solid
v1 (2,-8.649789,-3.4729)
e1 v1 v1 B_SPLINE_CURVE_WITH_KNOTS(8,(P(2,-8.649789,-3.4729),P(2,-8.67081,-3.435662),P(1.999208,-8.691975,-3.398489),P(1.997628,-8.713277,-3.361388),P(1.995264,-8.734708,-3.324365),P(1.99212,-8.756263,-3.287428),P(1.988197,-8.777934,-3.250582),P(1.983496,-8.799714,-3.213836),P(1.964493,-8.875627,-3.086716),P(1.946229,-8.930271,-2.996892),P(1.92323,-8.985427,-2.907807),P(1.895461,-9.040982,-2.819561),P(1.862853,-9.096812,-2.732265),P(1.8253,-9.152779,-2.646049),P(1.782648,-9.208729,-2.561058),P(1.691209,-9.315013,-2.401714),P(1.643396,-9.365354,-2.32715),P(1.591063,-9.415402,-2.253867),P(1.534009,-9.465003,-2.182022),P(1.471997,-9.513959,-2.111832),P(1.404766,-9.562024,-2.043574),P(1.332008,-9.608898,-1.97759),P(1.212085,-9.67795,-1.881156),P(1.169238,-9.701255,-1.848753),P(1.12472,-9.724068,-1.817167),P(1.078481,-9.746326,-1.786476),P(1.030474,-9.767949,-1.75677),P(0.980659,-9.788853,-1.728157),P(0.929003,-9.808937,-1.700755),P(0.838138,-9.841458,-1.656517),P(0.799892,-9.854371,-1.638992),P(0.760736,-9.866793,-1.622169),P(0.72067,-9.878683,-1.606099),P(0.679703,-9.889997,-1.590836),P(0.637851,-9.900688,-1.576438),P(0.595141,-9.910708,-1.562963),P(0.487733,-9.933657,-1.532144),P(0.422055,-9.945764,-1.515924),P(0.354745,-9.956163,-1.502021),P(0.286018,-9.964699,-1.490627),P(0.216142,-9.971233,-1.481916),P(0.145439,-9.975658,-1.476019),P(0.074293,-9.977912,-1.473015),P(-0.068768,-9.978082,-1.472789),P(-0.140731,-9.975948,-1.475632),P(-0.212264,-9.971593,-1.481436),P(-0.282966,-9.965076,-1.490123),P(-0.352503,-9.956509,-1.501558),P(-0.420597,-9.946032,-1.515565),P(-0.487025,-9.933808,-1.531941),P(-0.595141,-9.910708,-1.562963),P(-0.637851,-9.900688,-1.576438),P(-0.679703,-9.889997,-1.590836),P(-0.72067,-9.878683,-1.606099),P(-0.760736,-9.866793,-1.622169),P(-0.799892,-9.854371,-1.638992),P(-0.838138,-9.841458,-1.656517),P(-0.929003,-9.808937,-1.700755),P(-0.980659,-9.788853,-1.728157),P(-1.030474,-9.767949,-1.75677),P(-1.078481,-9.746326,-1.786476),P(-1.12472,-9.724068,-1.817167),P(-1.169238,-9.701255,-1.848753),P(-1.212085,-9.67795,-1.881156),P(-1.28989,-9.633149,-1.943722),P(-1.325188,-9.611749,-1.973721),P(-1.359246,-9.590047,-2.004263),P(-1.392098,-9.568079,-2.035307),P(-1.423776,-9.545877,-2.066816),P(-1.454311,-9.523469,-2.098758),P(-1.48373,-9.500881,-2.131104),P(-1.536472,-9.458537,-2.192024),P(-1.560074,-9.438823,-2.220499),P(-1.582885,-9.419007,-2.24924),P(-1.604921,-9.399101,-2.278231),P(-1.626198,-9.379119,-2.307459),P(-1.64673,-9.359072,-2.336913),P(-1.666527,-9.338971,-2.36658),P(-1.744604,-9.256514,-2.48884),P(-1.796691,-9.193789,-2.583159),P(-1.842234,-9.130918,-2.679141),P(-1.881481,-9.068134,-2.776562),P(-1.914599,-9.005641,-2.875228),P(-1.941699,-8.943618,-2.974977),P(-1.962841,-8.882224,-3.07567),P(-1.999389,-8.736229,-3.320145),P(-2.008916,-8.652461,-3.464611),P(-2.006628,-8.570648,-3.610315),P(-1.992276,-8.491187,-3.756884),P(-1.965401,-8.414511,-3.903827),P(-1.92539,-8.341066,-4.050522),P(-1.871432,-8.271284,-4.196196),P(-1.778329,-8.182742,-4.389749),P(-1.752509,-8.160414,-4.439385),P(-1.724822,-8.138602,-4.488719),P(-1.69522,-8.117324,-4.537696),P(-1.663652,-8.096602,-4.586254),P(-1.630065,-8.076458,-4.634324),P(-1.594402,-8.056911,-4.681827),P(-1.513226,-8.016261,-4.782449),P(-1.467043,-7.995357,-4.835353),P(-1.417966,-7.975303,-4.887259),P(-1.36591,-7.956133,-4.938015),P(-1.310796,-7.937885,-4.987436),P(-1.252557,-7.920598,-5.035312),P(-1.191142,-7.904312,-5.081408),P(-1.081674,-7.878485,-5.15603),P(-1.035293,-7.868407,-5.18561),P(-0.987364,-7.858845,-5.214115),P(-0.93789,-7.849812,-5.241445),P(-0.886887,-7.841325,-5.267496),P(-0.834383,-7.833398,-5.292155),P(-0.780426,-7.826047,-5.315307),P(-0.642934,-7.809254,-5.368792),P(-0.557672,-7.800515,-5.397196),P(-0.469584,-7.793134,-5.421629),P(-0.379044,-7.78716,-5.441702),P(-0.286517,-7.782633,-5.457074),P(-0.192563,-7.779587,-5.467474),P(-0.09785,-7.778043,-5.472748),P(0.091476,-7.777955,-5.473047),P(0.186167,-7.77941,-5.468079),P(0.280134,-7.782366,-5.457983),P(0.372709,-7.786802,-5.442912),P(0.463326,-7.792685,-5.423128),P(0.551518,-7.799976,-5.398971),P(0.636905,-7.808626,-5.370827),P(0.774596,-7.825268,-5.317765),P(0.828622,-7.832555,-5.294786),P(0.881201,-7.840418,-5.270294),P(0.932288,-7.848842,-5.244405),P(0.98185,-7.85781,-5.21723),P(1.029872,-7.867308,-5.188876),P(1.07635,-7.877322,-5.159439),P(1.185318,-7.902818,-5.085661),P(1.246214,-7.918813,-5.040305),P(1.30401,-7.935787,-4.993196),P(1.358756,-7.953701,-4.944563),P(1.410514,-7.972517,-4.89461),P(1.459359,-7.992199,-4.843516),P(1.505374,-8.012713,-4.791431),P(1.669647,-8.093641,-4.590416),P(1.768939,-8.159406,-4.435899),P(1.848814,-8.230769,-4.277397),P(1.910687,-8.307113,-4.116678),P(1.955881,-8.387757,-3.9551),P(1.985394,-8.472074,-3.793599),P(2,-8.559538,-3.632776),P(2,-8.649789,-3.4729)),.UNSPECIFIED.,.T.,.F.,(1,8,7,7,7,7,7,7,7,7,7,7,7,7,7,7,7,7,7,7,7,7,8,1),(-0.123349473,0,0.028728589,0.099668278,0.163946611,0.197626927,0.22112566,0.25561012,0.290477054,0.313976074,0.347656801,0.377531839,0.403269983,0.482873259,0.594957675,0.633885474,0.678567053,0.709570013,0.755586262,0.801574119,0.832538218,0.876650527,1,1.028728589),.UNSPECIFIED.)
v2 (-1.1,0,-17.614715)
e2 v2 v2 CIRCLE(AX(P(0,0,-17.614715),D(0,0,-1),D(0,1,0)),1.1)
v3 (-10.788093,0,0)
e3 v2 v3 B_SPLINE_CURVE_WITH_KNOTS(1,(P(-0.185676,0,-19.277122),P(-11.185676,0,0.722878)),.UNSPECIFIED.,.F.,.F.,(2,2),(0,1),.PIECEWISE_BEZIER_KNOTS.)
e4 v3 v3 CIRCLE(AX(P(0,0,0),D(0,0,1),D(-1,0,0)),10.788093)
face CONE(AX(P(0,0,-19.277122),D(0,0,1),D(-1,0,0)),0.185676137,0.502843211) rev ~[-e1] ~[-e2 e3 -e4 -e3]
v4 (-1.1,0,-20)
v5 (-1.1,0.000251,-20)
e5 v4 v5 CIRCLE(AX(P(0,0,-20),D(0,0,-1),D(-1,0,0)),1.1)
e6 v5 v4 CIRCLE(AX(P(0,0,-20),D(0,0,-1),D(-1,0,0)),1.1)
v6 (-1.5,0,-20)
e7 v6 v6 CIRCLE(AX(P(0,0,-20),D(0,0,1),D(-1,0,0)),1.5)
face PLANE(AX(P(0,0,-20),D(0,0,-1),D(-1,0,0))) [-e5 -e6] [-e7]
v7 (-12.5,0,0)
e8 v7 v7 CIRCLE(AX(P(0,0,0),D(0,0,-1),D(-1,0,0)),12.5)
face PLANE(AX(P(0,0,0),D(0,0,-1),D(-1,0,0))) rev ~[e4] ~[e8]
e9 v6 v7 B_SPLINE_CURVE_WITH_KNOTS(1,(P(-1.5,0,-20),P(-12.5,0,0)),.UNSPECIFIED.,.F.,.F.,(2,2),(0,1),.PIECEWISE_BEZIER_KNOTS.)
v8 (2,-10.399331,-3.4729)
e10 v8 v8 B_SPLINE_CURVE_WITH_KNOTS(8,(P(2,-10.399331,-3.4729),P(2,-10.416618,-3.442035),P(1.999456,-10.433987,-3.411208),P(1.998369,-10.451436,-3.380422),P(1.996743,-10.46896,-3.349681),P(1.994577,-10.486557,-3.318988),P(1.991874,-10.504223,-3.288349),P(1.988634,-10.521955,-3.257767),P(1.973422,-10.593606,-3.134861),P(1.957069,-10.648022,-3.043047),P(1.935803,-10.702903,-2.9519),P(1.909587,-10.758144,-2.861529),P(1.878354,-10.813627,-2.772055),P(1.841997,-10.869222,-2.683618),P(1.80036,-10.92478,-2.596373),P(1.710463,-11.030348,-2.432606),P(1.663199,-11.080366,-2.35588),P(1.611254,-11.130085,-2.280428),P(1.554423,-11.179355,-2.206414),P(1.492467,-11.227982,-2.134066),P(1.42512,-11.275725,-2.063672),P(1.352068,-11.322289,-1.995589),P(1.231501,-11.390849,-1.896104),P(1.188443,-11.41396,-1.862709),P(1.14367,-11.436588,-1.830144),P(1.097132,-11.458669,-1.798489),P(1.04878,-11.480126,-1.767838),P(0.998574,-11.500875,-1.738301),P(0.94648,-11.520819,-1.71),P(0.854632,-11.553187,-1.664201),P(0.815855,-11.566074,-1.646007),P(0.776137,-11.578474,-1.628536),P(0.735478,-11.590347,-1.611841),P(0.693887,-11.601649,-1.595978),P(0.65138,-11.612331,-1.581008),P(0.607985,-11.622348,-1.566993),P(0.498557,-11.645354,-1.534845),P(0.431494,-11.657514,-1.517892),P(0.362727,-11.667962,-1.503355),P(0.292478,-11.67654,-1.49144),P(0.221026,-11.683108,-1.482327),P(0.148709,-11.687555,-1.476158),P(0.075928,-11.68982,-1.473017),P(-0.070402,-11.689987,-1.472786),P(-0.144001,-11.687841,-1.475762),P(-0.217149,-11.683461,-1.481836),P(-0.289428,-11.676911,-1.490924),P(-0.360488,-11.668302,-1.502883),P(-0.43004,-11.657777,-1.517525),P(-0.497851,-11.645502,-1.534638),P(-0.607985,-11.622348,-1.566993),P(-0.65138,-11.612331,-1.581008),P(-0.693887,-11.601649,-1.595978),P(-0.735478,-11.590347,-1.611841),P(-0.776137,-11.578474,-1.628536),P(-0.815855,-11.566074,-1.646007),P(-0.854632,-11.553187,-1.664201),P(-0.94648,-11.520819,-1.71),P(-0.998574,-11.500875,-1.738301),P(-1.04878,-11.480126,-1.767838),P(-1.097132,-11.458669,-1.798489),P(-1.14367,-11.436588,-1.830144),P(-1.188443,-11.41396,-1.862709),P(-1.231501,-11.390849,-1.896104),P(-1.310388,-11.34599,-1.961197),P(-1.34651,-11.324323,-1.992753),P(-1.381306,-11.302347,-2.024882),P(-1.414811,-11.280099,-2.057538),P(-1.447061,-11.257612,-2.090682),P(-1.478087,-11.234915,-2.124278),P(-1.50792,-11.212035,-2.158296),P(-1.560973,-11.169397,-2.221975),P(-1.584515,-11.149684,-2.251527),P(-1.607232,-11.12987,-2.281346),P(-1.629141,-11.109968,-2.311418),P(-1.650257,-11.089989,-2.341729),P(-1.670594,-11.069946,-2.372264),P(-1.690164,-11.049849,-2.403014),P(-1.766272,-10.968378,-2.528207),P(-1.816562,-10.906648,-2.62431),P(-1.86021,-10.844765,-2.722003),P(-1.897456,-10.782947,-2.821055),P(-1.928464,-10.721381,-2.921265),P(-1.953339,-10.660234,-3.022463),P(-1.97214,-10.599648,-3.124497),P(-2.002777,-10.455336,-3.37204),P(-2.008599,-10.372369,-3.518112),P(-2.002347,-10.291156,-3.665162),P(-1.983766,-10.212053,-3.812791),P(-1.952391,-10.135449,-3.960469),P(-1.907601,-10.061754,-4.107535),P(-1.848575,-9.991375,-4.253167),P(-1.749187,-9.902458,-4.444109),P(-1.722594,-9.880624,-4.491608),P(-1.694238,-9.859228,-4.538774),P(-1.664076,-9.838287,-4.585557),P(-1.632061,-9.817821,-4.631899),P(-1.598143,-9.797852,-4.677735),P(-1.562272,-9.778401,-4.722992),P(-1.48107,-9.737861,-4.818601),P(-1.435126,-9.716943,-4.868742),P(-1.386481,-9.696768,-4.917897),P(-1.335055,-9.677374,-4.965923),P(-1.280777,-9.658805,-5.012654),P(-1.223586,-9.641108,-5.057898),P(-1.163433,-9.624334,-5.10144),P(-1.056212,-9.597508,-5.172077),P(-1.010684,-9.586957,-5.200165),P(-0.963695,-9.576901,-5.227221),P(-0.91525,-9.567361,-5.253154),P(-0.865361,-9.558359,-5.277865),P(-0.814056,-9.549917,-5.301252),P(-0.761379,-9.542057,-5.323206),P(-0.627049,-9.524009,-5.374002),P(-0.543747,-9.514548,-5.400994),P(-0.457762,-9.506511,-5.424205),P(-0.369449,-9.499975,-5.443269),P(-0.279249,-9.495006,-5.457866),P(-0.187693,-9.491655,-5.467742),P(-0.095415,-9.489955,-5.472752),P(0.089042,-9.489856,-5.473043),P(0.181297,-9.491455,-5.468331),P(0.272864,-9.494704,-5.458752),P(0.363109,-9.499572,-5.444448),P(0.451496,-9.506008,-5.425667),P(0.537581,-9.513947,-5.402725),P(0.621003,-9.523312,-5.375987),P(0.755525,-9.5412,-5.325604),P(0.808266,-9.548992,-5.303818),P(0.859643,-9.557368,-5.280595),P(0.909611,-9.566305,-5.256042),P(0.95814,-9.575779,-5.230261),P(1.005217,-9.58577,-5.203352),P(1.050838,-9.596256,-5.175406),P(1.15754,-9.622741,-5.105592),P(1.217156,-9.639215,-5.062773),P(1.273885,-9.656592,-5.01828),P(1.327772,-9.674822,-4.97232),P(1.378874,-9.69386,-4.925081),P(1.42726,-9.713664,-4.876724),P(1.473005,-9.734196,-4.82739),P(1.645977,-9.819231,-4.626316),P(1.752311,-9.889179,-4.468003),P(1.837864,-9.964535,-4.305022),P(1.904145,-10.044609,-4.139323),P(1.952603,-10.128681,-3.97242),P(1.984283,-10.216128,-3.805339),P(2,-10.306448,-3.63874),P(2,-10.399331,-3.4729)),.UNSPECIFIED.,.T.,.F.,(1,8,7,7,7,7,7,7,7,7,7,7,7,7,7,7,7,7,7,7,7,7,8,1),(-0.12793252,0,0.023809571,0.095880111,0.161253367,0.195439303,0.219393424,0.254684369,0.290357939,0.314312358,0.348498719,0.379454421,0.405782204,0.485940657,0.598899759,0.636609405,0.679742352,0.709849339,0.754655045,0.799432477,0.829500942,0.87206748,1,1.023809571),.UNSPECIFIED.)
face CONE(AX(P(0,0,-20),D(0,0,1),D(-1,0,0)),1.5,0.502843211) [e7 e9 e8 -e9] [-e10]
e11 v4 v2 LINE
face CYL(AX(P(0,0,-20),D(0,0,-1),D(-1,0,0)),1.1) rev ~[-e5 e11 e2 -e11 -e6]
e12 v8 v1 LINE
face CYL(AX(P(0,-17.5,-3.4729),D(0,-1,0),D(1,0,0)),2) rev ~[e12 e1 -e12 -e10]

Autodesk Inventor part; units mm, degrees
ref_plane "YZ Plane" through (0, 0, 0) normal (1, 0, 0) x (0, 1, 0)
ref_plane "XZ Plane" through (0, 0, 0) normal (0, 1, 0) x (-1, 0, 0)
ref_plane "XY Plane" through (0, 0, 0) normal (0, 0, 1) x (1, 0, 0)
sketch "Esquisse1" plane through (0, 0, 0) normal (0, 0, 1) x (1, 0, 0)
  circle A0 centre (0, 0) radius 12.5
  dimension "d0" = 25
extrude "Extrusion1" add sketch "Esquisse1" along normal blind 20
shell "Coque1" thickness 1.5 removed faces 1 at (2.488, -2.432, 20)
ref_plane "Plan de construction1" through (0, 0, -20) normal (0, 0, -1) x (-1, 0, 0)
sketch "Esquisse2" plane through (0, 0, -20) normal (0, 0, -1) x (-1, 0, 0)
  circle A0 centre (0, 0) radius 1.5
  dimension "d5" = 3
loft "Lissage1" add profiles "Esquisse2" section 2 edges at (-12.5, 0, 0)
shell "Coque2" thickness 1.5 removed faces 1 at (0.3952, -0.1996, -20)
sketch "Esquisse3" plane through (0, 0, -20) normal (0, 0, -1) x (-1, 0, 0)
  circle A0 centre (0, 0) radius 1.1
  dimension "d11" = 2.2
extrude "Extrusion2" cut sketch "Esquisse3" against normal blind 10
sketch "Esquisse4" plane through (0, 0, 20) normal (0, 0, 1) x (1, 0, 0)
  circle A0 centre (0, 0) radius 12.5 projected
  point P0 (0, -12.5)
ref_plane "Plan de construction2" through (0, -12.5, 20) normal (0, -1, 0) x (1, 0, 0)
sketch "Esquisse5" plane through (0, -12.5, 20) normal (0, -1, 0) x (1, 0, 0)
  circle A0 centre (0, -23.4729) radius 1
  circle A1 centre (0, -23.4729) radius 1.5
  point P0 (0, -20)
  dimension "d14" = 2
  dimension "d15" = 3
extrude "Extrusion3" add sketch "Esquisse5" along normal mid plane 10
sketch "Esquisse6" plane through (0, -17.5, -3.4729) normal (0, -1, 0) x (1, 0, 0)
  circle A0 centre (0, 0) radius 1
  point P0 (0, 3.4729)
extrude "Extrusion4" cut sketch "Esquisse6" against normal blind 15
sketch "Esquisse7" plane through (0, -17.5, -3.4729) normal (0, -1, 0) x (1, 0, 0)
  point P0 (0, 3.4729)
sketch "Esquisse8" plane through (0, -17.5, -3.4729) normal (0, -1, 0) x (1, 0, 0)
  circle A0 centre (0, 0) radius 1 projected
  circle A1 centre (0, 0) radius 2
  point P0 (0, 3.4729)
  dimension "d20" = 4
extrude "Extrusion5" cut sketch "Esquisse8" against normal blind 10
sketch "Esquisse9" plane through (0, 0, 0) normal (0, 0, -1) x (-1, 0, 0)
  circle A0 centre (0, 0) radius 20.0804
extrude "Extrusion6" cut sketch "Esquisse9" against normal blind 20
properties part number "EMBOUT"
